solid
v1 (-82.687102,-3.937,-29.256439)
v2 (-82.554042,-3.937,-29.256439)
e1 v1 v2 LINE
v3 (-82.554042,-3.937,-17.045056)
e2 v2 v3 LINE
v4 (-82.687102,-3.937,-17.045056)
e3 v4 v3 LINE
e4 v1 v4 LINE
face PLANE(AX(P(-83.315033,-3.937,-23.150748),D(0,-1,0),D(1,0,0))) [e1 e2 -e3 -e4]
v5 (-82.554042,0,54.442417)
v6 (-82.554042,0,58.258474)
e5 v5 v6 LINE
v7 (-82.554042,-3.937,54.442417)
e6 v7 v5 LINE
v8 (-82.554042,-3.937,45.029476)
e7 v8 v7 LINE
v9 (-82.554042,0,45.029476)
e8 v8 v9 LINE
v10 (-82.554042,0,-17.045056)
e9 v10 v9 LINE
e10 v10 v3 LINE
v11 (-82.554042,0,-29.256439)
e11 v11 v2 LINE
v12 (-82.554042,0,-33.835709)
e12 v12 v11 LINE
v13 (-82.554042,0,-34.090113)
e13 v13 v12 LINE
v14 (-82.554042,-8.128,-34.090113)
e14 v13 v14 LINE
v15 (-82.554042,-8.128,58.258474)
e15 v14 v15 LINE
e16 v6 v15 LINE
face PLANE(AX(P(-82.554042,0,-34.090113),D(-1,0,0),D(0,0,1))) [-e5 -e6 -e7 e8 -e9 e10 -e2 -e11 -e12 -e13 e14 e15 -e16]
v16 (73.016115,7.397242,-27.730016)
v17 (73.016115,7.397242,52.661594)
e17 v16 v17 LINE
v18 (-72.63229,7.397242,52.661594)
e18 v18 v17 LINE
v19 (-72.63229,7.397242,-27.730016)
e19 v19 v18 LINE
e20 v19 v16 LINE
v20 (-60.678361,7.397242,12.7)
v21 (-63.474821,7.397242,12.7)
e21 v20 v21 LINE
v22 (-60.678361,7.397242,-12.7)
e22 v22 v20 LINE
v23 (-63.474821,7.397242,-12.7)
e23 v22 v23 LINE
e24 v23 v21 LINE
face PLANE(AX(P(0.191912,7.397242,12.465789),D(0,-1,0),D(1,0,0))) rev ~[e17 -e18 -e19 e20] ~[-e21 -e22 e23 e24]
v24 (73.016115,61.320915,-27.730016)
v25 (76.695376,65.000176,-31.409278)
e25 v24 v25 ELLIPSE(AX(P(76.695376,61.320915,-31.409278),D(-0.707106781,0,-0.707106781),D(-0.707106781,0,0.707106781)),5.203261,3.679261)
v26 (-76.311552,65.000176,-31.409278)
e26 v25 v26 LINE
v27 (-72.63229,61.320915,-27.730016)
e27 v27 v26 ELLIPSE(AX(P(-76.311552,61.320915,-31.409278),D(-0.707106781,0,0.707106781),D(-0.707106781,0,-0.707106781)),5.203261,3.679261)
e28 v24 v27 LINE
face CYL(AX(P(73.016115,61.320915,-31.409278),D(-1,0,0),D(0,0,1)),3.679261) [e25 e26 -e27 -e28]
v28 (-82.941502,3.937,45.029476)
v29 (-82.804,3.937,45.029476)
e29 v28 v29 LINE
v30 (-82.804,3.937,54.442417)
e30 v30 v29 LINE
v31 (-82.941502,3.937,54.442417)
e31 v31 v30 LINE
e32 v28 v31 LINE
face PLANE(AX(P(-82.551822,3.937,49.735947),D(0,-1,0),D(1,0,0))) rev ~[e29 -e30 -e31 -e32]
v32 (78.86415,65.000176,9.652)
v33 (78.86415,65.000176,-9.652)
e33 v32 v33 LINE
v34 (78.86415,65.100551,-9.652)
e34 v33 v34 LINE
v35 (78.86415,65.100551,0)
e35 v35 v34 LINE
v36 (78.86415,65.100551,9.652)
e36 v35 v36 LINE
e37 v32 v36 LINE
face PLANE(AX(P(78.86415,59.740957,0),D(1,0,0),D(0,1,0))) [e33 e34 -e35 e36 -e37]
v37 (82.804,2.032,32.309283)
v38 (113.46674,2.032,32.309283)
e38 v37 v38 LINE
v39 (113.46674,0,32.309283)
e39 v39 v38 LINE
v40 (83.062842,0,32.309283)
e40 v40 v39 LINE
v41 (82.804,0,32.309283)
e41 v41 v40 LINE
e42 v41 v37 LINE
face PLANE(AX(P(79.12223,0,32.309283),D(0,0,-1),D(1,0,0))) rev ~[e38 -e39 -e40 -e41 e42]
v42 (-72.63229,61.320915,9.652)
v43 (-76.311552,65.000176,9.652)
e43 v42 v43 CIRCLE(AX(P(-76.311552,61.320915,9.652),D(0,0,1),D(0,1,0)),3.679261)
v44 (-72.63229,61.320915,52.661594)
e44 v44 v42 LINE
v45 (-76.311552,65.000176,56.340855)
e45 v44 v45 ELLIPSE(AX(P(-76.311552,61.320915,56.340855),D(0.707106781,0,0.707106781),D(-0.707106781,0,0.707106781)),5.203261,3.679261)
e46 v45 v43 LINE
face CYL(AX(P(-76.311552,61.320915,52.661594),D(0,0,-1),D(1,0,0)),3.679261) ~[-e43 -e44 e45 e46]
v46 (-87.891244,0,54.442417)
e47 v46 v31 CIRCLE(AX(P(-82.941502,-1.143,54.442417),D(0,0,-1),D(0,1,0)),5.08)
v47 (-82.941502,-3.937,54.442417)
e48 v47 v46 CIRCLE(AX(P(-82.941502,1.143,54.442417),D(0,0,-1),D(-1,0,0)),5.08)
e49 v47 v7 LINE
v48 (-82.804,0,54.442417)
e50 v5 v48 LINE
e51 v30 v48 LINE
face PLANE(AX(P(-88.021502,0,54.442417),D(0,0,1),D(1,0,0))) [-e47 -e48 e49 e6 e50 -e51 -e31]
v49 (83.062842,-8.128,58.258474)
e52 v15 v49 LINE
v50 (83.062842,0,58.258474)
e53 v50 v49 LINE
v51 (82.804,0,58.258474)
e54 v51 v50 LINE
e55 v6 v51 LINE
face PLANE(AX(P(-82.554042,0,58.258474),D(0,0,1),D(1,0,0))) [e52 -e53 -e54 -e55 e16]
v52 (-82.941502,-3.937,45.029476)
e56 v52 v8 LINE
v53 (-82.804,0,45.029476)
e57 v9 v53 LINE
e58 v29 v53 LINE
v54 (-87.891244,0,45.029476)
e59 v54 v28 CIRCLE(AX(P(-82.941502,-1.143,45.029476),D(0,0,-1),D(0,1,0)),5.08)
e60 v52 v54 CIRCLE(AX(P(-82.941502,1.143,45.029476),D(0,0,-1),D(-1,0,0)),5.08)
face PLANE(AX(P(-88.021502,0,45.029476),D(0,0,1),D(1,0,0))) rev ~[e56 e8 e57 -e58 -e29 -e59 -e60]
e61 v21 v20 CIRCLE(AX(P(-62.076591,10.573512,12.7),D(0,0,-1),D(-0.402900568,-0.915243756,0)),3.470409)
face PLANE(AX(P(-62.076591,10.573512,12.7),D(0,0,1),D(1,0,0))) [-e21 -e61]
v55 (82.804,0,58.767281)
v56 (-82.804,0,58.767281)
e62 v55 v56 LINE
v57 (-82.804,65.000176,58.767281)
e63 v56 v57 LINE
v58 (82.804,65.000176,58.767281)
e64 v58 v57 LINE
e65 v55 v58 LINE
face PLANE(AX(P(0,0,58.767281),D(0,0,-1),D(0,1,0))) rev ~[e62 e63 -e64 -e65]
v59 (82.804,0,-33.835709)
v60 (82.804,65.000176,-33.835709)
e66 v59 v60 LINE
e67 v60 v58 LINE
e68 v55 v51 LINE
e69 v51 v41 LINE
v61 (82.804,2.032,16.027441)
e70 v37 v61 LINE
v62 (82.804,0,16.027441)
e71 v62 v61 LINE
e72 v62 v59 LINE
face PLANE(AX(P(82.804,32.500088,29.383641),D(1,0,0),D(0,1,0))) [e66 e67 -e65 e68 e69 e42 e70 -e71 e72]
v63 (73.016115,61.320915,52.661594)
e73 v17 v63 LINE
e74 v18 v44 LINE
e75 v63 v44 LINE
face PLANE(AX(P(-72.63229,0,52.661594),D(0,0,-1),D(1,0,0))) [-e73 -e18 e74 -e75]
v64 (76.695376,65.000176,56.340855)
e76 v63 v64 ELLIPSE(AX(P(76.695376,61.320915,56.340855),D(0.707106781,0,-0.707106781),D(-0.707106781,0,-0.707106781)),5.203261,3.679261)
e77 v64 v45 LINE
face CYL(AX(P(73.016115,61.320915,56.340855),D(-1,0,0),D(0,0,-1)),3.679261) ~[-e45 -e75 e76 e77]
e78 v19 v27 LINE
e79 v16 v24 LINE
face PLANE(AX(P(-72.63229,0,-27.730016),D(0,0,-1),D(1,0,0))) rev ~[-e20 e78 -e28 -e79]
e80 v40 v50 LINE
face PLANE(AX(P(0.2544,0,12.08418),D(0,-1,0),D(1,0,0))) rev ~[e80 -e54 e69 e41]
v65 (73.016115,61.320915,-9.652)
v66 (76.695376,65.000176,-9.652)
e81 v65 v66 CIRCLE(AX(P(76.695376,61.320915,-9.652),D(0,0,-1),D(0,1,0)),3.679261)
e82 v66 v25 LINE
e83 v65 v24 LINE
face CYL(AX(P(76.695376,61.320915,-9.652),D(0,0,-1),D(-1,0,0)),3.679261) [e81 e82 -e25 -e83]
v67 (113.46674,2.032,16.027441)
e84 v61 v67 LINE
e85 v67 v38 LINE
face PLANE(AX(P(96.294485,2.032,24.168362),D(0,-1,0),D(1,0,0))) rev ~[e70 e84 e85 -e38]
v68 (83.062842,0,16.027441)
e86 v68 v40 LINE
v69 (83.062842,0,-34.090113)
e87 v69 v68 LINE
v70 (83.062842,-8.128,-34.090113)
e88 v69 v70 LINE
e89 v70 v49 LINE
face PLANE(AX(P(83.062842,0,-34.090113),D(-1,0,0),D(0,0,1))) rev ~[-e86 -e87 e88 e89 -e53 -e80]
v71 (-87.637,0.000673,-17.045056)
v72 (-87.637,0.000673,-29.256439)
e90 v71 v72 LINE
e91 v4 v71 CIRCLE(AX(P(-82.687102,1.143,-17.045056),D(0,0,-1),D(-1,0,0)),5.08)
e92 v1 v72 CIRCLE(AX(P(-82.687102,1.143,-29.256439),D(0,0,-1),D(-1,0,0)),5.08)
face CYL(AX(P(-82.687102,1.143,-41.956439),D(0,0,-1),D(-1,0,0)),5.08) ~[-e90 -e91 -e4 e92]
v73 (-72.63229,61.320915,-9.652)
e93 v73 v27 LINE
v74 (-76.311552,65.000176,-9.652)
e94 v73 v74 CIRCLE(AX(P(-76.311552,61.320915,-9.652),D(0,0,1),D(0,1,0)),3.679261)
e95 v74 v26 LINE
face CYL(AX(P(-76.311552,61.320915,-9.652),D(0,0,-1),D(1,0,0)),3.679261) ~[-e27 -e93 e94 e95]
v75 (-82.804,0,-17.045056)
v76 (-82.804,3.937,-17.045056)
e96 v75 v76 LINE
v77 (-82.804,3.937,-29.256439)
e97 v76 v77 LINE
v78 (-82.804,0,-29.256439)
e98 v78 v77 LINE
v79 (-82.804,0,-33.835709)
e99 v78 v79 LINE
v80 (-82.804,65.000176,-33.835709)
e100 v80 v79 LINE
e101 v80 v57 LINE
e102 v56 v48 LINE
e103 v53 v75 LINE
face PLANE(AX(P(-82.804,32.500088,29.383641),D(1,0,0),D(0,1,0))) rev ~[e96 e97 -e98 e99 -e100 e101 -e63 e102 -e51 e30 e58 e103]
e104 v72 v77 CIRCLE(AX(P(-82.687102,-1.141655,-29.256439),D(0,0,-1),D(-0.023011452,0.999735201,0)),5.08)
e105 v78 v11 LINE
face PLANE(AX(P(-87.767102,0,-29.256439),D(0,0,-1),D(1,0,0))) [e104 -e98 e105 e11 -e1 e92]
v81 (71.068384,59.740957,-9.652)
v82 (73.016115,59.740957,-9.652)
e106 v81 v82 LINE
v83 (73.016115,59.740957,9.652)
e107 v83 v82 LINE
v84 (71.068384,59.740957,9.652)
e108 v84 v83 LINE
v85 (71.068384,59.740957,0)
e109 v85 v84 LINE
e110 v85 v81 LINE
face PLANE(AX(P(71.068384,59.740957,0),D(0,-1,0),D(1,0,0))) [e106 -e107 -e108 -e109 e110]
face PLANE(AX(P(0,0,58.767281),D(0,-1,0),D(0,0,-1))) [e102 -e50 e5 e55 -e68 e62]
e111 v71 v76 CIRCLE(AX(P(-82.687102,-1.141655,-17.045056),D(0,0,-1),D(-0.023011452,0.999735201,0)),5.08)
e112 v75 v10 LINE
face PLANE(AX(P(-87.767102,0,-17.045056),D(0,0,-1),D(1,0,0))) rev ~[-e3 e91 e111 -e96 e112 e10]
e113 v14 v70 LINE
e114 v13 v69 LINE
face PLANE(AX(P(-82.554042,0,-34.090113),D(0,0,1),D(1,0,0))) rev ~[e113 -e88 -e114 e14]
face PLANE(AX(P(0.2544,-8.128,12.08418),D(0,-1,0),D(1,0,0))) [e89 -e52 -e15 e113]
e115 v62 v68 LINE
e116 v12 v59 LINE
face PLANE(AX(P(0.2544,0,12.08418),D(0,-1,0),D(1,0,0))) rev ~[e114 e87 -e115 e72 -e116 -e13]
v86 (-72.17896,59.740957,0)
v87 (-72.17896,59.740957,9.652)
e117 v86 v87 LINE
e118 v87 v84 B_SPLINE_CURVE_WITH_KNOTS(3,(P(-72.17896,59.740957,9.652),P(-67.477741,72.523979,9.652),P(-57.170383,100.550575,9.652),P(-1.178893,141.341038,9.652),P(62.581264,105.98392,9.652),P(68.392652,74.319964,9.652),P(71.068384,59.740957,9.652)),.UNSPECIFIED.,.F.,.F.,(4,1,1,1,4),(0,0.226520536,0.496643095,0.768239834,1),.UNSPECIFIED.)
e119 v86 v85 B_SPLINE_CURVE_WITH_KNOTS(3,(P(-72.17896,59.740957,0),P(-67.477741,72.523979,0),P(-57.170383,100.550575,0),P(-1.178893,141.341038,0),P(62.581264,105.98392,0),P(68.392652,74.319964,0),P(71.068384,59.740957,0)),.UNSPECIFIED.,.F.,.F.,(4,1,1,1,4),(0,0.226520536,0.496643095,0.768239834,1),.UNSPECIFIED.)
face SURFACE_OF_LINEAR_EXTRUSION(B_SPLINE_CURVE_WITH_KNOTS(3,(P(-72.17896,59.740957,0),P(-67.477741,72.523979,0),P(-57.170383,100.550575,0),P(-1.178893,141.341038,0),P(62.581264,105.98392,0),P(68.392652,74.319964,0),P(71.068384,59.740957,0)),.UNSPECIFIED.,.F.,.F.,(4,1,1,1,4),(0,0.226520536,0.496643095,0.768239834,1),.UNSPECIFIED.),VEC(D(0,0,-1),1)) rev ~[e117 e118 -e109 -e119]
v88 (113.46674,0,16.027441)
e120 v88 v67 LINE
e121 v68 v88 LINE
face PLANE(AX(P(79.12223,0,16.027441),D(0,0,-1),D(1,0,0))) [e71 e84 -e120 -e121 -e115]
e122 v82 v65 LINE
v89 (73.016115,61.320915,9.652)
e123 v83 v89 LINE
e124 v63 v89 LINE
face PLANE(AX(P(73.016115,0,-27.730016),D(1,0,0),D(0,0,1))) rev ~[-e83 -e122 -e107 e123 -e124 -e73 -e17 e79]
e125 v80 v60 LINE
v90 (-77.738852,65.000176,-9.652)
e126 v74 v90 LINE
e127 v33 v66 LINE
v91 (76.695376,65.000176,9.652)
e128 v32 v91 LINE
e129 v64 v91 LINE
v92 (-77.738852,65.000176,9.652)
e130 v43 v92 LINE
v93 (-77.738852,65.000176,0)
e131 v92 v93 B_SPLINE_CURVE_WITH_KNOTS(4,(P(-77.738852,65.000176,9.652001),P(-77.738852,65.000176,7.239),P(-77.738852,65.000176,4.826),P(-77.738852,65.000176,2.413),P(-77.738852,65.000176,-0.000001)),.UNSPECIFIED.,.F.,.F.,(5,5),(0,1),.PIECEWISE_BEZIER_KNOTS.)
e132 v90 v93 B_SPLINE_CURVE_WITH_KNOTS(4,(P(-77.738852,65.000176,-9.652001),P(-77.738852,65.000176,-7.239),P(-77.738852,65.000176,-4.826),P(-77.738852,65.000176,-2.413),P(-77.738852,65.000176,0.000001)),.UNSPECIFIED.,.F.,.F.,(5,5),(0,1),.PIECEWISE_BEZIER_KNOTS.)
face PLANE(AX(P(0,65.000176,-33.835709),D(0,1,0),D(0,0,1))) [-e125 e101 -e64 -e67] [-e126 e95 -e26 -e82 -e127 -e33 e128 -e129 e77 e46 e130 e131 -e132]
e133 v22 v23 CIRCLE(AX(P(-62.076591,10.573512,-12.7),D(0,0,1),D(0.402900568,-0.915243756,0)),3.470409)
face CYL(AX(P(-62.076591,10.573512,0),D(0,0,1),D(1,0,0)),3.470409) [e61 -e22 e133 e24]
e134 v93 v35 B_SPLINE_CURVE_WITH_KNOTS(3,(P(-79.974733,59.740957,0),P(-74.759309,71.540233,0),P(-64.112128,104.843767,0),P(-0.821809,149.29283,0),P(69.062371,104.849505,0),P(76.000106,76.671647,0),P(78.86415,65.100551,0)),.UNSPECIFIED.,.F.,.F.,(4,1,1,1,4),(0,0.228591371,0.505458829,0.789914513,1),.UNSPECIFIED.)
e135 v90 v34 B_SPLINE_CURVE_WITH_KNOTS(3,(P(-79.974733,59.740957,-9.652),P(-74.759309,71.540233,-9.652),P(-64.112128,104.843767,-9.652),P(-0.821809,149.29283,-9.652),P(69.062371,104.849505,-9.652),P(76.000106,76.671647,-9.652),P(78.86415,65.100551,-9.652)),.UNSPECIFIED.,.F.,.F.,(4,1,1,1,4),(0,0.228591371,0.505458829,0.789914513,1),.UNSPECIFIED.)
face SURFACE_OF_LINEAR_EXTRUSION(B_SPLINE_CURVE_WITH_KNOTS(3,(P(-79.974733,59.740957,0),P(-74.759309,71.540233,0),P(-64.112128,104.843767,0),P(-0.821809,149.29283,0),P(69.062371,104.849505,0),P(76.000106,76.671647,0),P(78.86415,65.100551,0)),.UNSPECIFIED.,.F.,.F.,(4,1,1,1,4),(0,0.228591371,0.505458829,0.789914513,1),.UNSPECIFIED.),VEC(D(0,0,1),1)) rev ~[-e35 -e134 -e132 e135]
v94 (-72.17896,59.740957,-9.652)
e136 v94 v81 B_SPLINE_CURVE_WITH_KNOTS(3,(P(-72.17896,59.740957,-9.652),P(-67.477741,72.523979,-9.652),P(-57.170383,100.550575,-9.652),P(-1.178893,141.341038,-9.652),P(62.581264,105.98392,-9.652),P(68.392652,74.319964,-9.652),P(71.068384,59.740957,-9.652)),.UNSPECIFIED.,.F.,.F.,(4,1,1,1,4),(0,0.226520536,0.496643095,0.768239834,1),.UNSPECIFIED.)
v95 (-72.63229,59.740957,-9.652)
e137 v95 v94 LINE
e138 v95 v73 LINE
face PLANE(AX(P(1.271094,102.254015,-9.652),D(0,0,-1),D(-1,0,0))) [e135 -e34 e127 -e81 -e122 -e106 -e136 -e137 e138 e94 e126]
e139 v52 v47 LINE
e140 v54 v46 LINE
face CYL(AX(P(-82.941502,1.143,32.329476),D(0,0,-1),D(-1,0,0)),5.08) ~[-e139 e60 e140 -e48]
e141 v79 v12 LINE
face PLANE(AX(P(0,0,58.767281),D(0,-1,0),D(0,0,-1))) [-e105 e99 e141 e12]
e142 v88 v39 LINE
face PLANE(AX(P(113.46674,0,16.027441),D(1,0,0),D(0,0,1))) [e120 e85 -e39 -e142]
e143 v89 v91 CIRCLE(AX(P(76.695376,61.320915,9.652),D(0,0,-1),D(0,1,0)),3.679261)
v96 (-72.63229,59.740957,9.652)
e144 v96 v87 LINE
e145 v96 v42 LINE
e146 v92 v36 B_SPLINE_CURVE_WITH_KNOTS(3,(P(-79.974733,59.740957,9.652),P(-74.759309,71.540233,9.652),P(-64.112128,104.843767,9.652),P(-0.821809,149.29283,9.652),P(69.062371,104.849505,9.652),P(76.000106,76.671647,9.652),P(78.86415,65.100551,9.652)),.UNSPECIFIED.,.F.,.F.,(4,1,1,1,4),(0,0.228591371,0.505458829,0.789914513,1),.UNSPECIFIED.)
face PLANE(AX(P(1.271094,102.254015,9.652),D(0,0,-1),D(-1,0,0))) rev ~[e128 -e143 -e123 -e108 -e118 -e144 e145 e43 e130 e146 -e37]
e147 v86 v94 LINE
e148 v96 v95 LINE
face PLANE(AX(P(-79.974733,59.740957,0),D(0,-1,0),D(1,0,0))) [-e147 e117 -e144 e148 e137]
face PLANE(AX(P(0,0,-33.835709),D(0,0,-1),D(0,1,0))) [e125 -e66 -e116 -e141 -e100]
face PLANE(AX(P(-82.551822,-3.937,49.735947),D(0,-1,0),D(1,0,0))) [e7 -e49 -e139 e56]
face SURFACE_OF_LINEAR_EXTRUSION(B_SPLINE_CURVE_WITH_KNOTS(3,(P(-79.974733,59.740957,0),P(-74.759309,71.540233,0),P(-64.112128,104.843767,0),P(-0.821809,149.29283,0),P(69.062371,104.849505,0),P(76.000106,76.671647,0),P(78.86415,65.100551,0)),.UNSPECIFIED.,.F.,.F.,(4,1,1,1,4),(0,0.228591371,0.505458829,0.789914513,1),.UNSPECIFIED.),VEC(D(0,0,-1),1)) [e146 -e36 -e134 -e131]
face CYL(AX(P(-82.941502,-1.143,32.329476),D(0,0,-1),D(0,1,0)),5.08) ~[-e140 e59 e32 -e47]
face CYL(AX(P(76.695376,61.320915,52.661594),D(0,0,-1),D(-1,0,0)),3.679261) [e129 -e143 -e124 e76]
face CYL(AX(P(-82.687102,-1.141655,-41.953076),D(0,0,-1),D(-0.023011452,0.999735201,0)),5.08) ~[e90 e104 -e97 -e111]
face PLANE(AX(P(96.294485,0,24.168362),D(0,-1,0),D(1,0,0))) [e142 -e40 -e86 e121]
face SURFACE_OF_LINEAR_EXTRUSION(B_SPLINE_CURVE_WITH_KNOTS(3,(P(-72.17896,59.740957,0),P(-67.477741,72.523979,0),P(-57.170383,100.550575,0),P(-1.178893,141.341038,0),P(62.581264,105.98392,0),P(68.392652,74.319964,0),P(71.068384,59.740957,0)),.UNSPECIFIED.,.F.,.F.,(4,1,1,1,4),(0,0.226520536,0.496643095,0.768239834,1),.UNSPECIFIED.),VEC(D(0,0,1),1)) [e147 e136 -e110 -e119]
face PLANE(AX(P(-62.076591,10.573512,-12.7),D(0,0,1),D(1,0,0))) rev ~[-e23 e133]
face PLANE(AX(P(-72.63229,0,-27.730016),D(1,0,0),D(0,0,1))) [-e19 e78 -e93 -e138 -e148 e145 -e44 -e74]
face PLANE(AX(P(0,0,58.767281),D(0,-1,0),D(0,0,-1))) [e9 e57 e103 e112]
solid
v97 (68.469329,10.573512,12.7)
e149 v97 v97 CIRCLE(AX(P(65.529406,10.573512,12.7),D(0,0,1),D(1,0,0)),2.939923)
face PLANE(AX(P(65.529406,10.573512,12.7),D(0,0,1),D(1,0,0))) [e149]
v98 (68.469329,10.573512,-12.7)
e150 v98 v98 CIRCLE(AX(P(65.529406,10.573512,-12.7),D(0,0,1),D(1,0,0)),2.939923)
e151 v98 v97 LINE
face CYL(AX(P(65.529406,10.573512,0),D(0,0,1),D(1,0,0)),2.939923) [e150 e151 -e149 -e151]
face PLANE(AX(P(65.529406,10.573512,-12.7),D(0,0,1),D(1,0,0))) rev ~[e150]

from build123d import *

# Parameters (mm, degrees)
F0_W         = 165.6168848276
F0_H         = 92.3485867679
F1_DEPTH     = 8.128
F2_W         = 65.0001764297
F2_H         = 58.7672814727
F2_H_2       = 33.835709095
F3_DEPTH     = 82.804
F4_W         = 145.6484049559
F4_H         = 80.3916100413
F5_DEPTH     = 126.492
F7_DEPTH     = 9.652
F10_DEPTH    = 7.3972418904
F11_R        = 3.6792614691
F12_W        = 10.9393596649
F12_H        = 9.4129405916
F12_W_2      = 8.9041367173
F12_H_2      = 12.2113823891
F13_DEPTH    = 3.937
F14_T1_DEPTH = 34.8129405916
F14_T3_DEPTH = 37.6046565067
F14_T5_DEPTH = 37.6113823891
F17_R        = 3.4704088756
F18_DEPTH    = 12.7
F17_R_2      = 2.9399233627
F19_W        = 34.344509244
F19_H        = 16.2818413228
F20_DEPTH    = 2.032


# Not quite as in the source:
# - a fillet or chamfer that OpenCascade refuses, or shapes differently, is made with other operations: its cross-section is extruded or revolved along the edge and cut away or added
# - the program builds the solid bodies; features that only make, move or delete a surface that nothing else refers to are left out


with BuildPart() as f1:
    # F0 (on Front) → F1 (new body)
    with BuildSketch(Plane.XZ):
        with Locations((0.2544000745, 12.0841804892)):
            Rectangle(F0_W, F0_H)
    extrude(amount=F1_DEPTH)

    # F2 (on Right) → F3 (join, symmetric)
    with BuildSketch(Plane.YZ):
        with Locations((32.5000882149, 29.3836407363)):
            Rectangle(F2_W, F2_H)
        with Locations((32.5000882149, -16.9178545475)):
            Rectangle(F2_W, F2_H_2)
    extrude(amount=F3_DEPTH, both=True)

    # F4 (on Front) → F5 (cut)
    with BuildSketch(Plane.XZ):
        with Locations((0.191912055, 12.4657889828)):
            Rectangle(F4_W, F4_H)
    extrude(amount=-F5_DEPTH, mode=Mode.SUBTRACT)

    # F6 (on Top) → F7 (join, symmetric)
    with BuildSketch(Plane.XY):
        with BuildLine():
            add(Edge.make_bspline(
                [(-79.9747332931, 59.7409568727), (-74.759309212, 71.5402326481), (-64.1121283898, 104.8437669446), (-0.8218087411, 149.2928303601), (69.0623713402, 104.8495046273), (76.000106137, 76.6716472512), (78.8641497493, 65.1005506516)],
                knots=[0, 0, 0, 0, 0.2285913714, 0.5054588291, 0.7899145134, 1, 1, 1, 1], degree=3))
            Line((-79.9747332931, 59.7409568727), (-72.1789598465, 59.7409568727))
            add(Edge.make_bspline(
                [(-72.1789598465, 59.7409568727), (-67.4777405263, 72.5239789548), (-57.1703831688, 100.5505754042), (-1.1788929882, 141.3410376084), (62.5812635029, 105.9839202997), (68.3926515764, 74.3199638324), (71.0683837533, 59.7409568727)],
                knots=[0, 0, 0, 0, 0.226520536, 0.4966430951, 0.7682398336, 1, 1, 1, 1], degree=3))
            Line((71.0683837533, 59.7409568727), (78.8641497493, 59.7409568727))
            Line((78.8641497493, 59.7409568727), (78.8641497493, 65.1005506516))
        make_face()
    extrude(amount=F7_DEPTH, both=True)

    # F10 (add): a face of the model
    f10_faces = [f1.faces().sort_by_distance(p)[0] for p in [
        (0.191912055, 0, 12.4657889828),
    ]]
    extrude(f10_faces, amount=F10_DEPTH)

    # F11
    f11_edges = [f1.edges().sort_by_distance(p)[0] for p in [
        (0.191912, 65.000176, -27.730016),
        (0.191912, 65.000176, 52.661594),
        (-72.63229, 65.000176, 31.156797),
        (73.016115, 65.000176, 31.156797),
        (73.016115, 65.000176, -18.691008),
        (-72.63229, 65.000176, -18.691008),
    ]]
    fillet(f11_edges, radius=F11_R)

    # F12 (on Front) → F13 (join, symmetric)
    with BuildSketch(Plane.XZ):
        with Locations((-82.5518220663, 49.7359465808)):
            Rectangle(F12_W, F12_H)
        with Locations((-83.3150334656, -23.1507476419)):
            Rectangle(F12_W_2, F12_H_2)
    extrude(amount=F13_DEPTH, both=True)

    # F14: fillet of radius 5.08 on 4 edges, made by hand

    # F14_s2 → F14_t1 (cut)
    with BuildSketch(Plane.XY.offset(32.329476285)):
        with BuildLine():
            ThreePointArc((-82.9415018988, 3.937), (-86.5336043472, 2.4491024484), (-88.0215018988, -1.143))
            Line((-88.0215018988, -1.143), (-88.0215018988, 3.937))
            Line((-88.0215018988, 3.937), (-82.9415018988, 3.937))
        make_face()
        with BuildLine():
            ThreePointArc((-88.0215018988, 1.143), (-86.5336043472, -2.4491024484), (-82.9415018988, -3.937))
            Line((-82.9415018988, -3.937), (-88.0215018988, -3.937))
            Line((-88.0215018988, -3.937), (-88.0215018988, 1.143))
        make_face()
    extrude(amount=F14_T1_DEPTH, mode=Mode.SUBTRACT)

    # F14_s4 → F14_t3 (cut)
    with BuildSketch(Plane.XY.offset(-41.9530758953)):
        with BuildLine():
            ThreePointArc((-82.804, 3.937), (-86.3202989517, 2.4088773385), (-87.7671018243, -1.1416548235))
            Line((-87.7671018243, -1.1416548235), (-87.7671018243, 3.937))
            Line((-87.7671018243, 3.937), (-82.804, 3.937))
        make_face()
    extrude(amount=F14_T3_DEPTH, mode=Mode.SUBTRACT)

    # F14_s6 → F14_t5 (cut)
    with BuildSketch(Plane.XY.offset(-41.9564388365)):
        with BuildLine():
            ThreePointArc((-87.7671018243, 1.143), (-86.2792042727, -2.4491024484), (-82.6871018243, -3.937))
            Line((-82.6871018243, -3.937), (-87.7671018243, -3.937))
            Line((-87.7671018243, -3.937), (-87.7671018243, 1.143))
        make_face()
    extrude(amount=F14_T5_DEPTH, mode=Mode.SUBTRACT)

    # F17 (on Top) → F18 (join, symmetric)
    with BuildSketch(Plane.XY):
        with Locations((-62.0765909553, 10.5735119432)):
            Circle(F17_R)
    extrude(amount=F18_DEPTH, both=True)

    # F19 (on Front) → F20 (join)
    with BuildSketch(Plane.XZ):
        with Locations((96.2944850326, 24.1683619097)):
            Rectangle(F19_W, F19_H)
    extrude(amount=-F20_DEPTH)


with BuildPart() as f18:
    # F17 (on Top) → F18, piece 2 (new body, symmetric)
    with BuildSketch(Plane.XY):
        with Locations((65.5294060707, 10.5735119432)):
            Circle(F17_R_2)
    extrude(amount=F18_DEPTH, both=True)


solid = Compound([f1.part, f18.part])
